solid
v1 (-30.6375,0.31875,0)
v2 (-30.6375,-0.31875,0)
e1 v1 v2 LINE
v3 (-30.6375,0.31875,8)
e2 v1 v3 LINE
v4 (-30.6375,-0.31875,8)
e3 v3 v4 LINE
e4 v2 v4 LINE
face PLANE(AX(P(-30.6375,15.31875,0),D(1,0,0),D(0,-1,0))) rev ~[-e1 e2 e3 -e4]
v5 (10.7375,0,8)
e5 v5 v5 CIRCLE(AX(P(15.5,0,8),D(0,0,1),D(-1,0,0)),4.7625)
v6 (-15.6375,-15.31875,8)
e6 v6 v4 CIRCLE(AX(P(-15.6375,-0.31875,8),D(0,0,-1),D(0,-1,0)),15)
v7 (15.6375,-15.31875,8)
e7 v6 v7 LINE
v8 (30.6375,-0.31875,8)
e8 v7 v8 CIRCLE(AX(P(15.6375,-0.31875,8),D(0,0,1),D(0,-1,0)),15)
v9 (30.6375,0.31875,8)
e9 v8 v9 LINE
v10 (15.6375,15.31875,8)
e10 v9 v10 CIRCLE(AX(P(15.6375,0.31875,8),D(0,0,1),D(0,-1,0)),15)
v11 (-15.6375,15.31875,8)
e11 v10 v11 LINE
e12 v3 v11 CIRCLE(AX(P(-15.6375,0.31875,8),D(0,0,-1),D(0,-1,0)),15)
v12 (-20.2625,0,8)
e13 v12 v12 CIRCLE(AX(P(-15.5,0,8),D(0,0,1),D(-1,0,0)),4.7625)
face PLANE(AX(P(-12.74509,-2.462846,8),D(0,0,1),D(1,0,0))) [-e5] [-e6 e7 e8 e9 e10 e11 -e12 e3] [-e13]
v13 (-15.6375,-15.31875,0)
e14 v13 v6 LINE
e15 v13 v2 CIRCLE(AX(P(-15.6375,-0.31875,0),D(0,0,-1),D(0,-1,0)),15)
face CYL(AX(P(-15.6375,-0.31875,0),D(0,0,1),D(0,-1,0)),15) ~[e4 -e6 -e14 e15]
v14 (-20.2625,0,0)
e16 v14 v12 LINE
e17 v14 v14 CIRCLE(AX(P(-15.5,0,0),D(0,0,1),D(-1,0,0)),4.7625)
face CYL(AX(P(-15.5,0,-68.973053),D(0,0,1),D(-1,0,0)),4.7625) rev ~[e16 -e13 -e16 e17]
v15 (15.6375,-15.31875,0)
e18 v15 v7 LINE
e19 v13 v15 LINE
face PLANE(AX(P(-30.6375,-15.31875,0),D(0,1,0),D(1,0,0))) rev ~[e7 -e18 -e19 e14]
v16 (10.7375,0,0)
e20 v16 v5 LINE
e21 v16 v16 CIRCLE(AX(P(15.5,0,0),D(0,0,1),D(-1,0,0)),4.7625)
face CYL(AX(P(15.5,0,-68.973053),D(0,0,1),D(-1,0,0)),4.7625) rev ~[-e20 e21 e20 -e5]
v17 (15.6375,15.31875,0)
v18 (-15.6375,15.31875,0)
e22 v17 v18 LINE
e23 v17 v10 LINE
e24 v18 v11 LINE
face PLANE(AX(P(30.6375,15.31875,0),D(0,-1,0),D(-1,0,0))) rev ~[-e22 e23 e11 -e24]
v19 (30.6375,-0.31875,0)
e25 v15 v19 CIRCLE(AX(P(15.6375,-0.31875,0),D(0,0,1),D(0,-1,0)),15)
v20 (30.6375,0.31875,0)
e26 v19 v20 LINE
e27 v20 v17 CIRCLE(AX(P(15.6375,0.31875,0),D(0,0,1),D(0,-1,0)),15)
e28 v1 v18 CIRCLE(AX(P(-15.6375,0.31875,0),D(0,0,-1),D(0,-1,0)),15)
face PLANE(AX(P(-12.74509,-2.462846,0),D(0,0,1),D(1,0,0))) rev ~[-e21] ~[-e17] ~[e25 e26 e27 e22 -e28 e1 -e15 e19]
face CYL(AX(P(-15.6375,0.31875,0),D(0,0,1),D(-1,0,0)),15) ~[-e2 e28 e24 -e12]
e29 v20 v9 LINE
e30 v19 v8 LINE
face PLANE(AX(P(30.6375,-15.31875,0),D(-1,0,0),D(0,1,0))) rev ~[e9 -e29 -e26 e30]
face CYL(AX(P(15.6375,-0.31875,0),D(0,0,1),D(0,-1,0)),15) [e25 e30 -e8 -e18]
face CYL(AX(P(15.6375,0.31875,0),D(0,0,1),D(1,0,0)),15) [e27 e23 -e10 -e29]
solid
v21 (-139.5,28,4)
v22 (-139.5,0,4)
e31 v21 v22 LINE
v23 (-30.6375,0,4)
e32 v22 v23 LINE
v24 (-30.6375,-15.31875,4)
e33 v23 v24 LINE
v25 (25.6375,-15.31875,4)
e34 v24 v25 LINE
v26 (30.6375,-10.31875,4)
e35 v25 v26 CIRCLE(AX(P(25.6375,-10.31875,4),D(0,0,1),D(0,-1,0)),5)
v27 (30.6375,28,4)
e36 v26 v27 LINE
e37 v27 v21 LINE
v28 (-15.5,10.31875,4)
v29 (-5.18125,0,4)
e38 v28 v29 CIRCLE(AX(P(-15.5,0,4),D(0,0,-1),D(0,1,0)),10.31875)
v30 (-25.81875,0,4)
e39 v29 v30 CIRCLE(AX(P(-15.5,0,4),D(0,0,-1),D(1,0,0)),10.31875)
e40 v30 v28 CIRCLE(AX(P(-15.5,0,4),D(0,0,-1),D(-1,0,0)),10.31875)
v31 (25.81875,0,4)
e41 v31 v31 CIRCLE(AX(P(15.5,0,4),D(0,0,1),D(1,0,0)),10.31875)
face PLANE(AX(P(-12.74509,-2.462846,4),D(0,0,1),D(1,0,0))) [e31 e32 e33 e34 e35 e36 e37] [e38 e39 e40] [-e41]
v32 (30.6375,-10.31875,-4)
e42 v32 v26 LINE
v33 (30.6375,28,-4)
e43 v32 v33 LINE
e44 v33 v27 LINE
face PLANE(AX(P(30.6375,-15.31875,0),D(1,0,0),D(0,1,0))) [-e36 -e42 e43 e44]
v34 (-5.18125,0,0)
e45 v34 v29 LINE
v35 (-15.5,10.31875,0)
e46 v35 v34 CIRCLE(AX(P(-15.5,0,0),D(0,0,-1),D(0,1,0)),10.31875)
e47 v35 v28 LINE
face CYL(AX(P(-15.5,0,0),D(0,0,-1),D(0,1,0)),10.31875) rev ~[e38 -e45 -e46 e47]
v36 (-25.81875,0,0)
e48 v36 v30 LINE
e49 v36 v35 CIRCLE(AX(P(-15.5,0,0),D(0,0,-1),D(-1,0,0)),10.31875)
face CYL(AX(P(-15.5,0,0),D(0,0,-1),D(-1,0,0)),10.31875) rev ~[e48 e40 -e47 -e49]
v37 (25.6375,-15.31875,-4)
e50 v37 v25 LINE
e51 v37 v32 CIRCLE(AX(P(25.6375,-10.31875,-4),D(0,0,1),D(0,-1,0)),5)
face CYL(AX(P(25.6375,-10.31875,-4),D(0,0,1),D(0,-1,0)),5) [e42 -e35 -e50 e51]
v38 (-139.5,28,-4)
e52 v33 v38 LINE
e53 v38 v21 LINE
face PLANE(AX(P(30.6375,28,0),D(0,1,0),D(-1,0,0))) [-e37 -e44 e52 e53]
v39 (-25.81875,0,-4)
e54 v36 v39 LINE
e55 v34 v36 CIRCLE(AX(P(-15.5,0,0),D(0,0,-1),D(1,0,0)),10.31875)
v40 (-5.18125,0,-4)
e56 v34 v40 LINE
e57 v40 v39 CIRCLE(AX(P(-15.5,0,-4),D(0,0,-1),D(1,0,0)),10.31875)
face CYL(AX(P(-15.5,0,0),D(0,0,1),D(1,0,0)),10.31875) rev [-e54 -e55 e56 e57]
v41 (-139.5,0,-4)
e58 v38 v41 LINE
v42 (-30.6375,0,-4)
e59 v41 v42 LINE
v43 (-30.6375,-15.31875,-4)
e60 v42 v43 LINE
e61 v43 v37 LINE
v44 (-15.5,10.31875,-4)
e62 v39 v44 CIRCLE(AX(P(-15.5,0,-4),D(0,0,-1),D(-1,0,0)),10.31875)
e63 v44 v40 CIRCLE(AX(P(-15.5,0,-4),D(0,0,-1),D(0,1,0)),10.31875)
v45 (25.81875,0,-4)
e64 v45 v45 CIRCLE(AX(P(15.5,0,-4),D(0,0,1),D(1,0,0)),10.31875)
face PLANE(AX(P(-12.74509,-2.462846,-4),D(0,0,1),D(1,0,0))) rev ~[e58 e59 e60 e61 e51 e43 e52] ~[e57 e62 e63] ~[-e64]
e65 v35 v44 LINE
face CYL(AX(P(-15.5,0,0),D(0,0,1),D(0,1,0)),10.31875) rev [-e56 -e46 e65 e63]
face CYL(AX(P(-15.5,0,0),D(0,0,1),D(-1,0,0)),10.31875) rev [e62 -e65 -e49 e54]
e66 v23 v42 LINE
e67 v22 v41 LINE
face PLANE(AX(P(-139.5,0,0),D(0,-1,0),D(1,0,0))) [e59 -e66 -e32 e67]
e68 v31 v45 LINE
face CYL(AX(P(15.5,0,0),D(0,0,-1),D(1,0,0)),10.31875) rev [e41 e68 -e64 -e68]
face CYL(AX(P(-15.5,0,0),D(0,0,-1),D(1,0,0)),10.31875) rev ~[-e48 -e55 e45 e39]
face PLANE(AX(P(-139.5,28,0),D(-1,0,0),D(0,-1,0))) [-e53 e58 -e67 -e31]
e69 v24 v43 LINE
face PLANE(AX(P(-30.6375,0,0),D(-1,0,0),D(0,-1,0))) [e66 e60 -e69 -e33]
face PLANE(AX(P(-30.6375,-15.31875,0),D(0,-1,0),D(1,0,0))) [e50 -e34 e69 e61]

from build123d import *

# Parameters (mm, degrees)
F0_W     = 30.6375
F0_H     = 30.6375
F0_R     = 10.31875
F0_W_2   = 15.1375
F0_H_2   = 12.68125
F1_DEPTH = 4
F2_DEPTH = 8
F3_D     = 9.525
F4_R     = 15
F5_R     = 5


# Not quite as in the source:
# - a length typed as a fraction of an inch, garbled in the dataset ("3 / 203.2 mm" for 3/8 in), is restored


with BuildPart() as f1:
    # F0 (on Top) → F1 (new body, symmetric)
    with BuildSketch(Plane.XY):
        with BuildLine():
            Line((-30.6375, -15.31875), (0, -15.31875))
            Line((0, -15.31875), (0, 15.31875))
            Line((0, 15.31875), (-15.5, 15.31875))
            Line((-15.5, 15.31875), (-15.5, 10.31875))
            ThreePointArc((-15.5, 10.31875), (-8.2035419016, 7.2964580984), (-5.18125, 0))
            ThreePointArc((-5.18125, 0), (-15.5, -10.31875), (-25.81875, 0))
            Line((-25.81875, 0), (-30.6375, 0))
            Line((-30.6375, 0), (-30.6375, -15.31875))
        make_face()
        with BuildLine():
            Line((-30.6375, 15.31875), (-30.6375, 0))
            Line((-30.6375, 0), (-25.81875, 0))
            ThreePointArc((-25.81875, 0), (-22.7964580984, 7.2964580984), (-15.5, 10.31875))
            Line((-15.5, 10.31875), (-15.5, 15.31875))
            Line((-15.5, 15.31875), (-30.6375, 15.31875))
        make_face()
        with Locations((15.31875, 0)):
            Rectangle(F0_W, F0_H)
        with Locations((15.5, 0)):
            Circle(F0_R, mode=Mode.SUBTRACT)
        with BuildLine():
            Line((-30.6375, -15.31875), (0, -15.31875))
            Line((0, -15.31875), (0, 15.31875))
            Line((0, 15.31875), (-15.5, 15.31875))
            Line((-15.5, 15.31875), (-15.5, 10.31875))
            ThreePointArc((-15.5, 10.31875), (-8.2035419016, 7.2964580984), (-5.18125, 0))
            ThreePointArc((-5.18125, 0), (-15.5, -10.31875), (-25.81875, 0))
            Line((-25.81875, 0), (-30.6375, 0))
            Line((-30.6375, 0), (-30.6375, -15.31875))
        make_face()
        Polygon((0, 15.31875), (30.6375, 15.31875), (30.6375, 28), (-15.5, 28), (-15.5, 15.31875), align=None)
        with Locations((-23.06875, 21.659375)):
            Rectangle(F0_W_2, F0_H_2)
        Polygon((-139.5, 0), (-30.6375, 0), (-30.6375, 15.31875), (-30.6375, 28), (-139.5, 28), align=None)
    extrude(amount=F1_DEPTH, both=True)

    # F5
    f5_edges = [f1.edges().sort_by_distance(p)[0] for p in [
        (30.6375, -15.31875, 0),
    ]]
    fillet(f5_edges, radius=F5_R)


with BuildPart() as f2:
    # F0 (on Top) → F2 (new body)
    with BuildSketch(Plane.XY):
        with BuildLine():
            Line((-30.6375, -15.31875), (0, -15.31875))
            Line((0, -15.31875), (0, 15.31875))
            Line((0, 15.31875), (-15.5, 15.31875))
            Line((-15.5, 15.31875), (-15.5, 10.31875))
            ThreePointArc((-15.5, 10.31875), (-8.2035419016, 7.2964580984), (-5.18125, 0))
            ThreePointArc((-5.18125, 0), (-15.5, -10.31875), (-25.81875, 0))
            Line((-25.81875, 0), (-30.6375, 0))
            Line((-30.6375, 0), (-30.6375, -15.31875))
        make_face()
        with BuildLine():
            Line((-30.6375, 15.31875), (-30.6375, 0))
            Line((-30.6375, 0), (-25.81875, 0))
            ThreePointArc((-25.81875, 0), (-22.7964580984, 7.2964580984), (-15.5, 10.31875))
            Line((-15.5, 10.31875), (-15.5, 15.31875))
            Line((-15.5, 15.31875), (-30.6375, 15.31875))
        make_face()
        with BuildLine():
            Line((-30.6375, -15.31875), (0, -15.31875))
            Line((0, -15.31875), (0, 15.31875))
            Line((0, 15.31875), (-15.5, 15.31875))
            Line((-15.5, 15.31875), (-15.5, 10.31875))
            ThreePointArc((-15.5, 10.31875), (-8.2035419016, 7.2964580984), (-5.18125, 0))
            ThreePointArc((-5.18125, 0), (-15.5, -10.31875), (-25.81875, 0))
            Line((-25.81875, 0), (-30.6375, 0))
            Line((-30.6375, 0), (-30.6375, -15.31875))
        make_face()
        with Locations((15.31875, 0)):
            Rectangle(F0_W, F0_H)
        with Locations((15.5, 0)):
            Circle(F0_R, mode=Mode.SUBTRACT)
        with Locations((15.5, 0)):
            Circle(F0_R)
        with BuildLine():
            Line((-15.5, 0), (-25.81875, 0))
            ThreePointArc((-25.81875, 0), (-15.5, -10.31875), (-5.18125, 0))
            ThreePointArc((-5.18125, 0), (-8.2035419016, 7.2964580984), (-15.5, 10.31875))
            Line((-15.5, 10.31875), (-15.5, 0))
        make_face()
        with BuildLine():
            ThreePointArc((-15.5, 10.31875), (-22.7964580984, 7.2964580984), (-25.81875, 0))
            Line((-25.81875, 0), (-15.5, 0))
            Line((-15.5, 0), (-15.5, 10.31875))
        make_face()
    extrude(amount=F2_DEPTH)

    # F3 (through all)
    with Locations(Plane(origin=(0, 0, 0), x_dir=(1, 0, 0), z_dir=(0, 0, -1))):
        with Locations((-15.5, 0), (15.5, 0)):
            Hole(F3_D / 2)

    # F4
    f4_edges = [f2.edges().sort_by_distance(p)[0] for p in [
        (30.6375, 15.31875, 4),
        (30.6375, -15.31875, 4),
        (-30.6375, -15.31875, 4),
        (-30.6375, 15.31875, 4),
    ]]
    fillet(f4_edges, radius=F4_R)


solid = Compound([f1.part, f2.part])
